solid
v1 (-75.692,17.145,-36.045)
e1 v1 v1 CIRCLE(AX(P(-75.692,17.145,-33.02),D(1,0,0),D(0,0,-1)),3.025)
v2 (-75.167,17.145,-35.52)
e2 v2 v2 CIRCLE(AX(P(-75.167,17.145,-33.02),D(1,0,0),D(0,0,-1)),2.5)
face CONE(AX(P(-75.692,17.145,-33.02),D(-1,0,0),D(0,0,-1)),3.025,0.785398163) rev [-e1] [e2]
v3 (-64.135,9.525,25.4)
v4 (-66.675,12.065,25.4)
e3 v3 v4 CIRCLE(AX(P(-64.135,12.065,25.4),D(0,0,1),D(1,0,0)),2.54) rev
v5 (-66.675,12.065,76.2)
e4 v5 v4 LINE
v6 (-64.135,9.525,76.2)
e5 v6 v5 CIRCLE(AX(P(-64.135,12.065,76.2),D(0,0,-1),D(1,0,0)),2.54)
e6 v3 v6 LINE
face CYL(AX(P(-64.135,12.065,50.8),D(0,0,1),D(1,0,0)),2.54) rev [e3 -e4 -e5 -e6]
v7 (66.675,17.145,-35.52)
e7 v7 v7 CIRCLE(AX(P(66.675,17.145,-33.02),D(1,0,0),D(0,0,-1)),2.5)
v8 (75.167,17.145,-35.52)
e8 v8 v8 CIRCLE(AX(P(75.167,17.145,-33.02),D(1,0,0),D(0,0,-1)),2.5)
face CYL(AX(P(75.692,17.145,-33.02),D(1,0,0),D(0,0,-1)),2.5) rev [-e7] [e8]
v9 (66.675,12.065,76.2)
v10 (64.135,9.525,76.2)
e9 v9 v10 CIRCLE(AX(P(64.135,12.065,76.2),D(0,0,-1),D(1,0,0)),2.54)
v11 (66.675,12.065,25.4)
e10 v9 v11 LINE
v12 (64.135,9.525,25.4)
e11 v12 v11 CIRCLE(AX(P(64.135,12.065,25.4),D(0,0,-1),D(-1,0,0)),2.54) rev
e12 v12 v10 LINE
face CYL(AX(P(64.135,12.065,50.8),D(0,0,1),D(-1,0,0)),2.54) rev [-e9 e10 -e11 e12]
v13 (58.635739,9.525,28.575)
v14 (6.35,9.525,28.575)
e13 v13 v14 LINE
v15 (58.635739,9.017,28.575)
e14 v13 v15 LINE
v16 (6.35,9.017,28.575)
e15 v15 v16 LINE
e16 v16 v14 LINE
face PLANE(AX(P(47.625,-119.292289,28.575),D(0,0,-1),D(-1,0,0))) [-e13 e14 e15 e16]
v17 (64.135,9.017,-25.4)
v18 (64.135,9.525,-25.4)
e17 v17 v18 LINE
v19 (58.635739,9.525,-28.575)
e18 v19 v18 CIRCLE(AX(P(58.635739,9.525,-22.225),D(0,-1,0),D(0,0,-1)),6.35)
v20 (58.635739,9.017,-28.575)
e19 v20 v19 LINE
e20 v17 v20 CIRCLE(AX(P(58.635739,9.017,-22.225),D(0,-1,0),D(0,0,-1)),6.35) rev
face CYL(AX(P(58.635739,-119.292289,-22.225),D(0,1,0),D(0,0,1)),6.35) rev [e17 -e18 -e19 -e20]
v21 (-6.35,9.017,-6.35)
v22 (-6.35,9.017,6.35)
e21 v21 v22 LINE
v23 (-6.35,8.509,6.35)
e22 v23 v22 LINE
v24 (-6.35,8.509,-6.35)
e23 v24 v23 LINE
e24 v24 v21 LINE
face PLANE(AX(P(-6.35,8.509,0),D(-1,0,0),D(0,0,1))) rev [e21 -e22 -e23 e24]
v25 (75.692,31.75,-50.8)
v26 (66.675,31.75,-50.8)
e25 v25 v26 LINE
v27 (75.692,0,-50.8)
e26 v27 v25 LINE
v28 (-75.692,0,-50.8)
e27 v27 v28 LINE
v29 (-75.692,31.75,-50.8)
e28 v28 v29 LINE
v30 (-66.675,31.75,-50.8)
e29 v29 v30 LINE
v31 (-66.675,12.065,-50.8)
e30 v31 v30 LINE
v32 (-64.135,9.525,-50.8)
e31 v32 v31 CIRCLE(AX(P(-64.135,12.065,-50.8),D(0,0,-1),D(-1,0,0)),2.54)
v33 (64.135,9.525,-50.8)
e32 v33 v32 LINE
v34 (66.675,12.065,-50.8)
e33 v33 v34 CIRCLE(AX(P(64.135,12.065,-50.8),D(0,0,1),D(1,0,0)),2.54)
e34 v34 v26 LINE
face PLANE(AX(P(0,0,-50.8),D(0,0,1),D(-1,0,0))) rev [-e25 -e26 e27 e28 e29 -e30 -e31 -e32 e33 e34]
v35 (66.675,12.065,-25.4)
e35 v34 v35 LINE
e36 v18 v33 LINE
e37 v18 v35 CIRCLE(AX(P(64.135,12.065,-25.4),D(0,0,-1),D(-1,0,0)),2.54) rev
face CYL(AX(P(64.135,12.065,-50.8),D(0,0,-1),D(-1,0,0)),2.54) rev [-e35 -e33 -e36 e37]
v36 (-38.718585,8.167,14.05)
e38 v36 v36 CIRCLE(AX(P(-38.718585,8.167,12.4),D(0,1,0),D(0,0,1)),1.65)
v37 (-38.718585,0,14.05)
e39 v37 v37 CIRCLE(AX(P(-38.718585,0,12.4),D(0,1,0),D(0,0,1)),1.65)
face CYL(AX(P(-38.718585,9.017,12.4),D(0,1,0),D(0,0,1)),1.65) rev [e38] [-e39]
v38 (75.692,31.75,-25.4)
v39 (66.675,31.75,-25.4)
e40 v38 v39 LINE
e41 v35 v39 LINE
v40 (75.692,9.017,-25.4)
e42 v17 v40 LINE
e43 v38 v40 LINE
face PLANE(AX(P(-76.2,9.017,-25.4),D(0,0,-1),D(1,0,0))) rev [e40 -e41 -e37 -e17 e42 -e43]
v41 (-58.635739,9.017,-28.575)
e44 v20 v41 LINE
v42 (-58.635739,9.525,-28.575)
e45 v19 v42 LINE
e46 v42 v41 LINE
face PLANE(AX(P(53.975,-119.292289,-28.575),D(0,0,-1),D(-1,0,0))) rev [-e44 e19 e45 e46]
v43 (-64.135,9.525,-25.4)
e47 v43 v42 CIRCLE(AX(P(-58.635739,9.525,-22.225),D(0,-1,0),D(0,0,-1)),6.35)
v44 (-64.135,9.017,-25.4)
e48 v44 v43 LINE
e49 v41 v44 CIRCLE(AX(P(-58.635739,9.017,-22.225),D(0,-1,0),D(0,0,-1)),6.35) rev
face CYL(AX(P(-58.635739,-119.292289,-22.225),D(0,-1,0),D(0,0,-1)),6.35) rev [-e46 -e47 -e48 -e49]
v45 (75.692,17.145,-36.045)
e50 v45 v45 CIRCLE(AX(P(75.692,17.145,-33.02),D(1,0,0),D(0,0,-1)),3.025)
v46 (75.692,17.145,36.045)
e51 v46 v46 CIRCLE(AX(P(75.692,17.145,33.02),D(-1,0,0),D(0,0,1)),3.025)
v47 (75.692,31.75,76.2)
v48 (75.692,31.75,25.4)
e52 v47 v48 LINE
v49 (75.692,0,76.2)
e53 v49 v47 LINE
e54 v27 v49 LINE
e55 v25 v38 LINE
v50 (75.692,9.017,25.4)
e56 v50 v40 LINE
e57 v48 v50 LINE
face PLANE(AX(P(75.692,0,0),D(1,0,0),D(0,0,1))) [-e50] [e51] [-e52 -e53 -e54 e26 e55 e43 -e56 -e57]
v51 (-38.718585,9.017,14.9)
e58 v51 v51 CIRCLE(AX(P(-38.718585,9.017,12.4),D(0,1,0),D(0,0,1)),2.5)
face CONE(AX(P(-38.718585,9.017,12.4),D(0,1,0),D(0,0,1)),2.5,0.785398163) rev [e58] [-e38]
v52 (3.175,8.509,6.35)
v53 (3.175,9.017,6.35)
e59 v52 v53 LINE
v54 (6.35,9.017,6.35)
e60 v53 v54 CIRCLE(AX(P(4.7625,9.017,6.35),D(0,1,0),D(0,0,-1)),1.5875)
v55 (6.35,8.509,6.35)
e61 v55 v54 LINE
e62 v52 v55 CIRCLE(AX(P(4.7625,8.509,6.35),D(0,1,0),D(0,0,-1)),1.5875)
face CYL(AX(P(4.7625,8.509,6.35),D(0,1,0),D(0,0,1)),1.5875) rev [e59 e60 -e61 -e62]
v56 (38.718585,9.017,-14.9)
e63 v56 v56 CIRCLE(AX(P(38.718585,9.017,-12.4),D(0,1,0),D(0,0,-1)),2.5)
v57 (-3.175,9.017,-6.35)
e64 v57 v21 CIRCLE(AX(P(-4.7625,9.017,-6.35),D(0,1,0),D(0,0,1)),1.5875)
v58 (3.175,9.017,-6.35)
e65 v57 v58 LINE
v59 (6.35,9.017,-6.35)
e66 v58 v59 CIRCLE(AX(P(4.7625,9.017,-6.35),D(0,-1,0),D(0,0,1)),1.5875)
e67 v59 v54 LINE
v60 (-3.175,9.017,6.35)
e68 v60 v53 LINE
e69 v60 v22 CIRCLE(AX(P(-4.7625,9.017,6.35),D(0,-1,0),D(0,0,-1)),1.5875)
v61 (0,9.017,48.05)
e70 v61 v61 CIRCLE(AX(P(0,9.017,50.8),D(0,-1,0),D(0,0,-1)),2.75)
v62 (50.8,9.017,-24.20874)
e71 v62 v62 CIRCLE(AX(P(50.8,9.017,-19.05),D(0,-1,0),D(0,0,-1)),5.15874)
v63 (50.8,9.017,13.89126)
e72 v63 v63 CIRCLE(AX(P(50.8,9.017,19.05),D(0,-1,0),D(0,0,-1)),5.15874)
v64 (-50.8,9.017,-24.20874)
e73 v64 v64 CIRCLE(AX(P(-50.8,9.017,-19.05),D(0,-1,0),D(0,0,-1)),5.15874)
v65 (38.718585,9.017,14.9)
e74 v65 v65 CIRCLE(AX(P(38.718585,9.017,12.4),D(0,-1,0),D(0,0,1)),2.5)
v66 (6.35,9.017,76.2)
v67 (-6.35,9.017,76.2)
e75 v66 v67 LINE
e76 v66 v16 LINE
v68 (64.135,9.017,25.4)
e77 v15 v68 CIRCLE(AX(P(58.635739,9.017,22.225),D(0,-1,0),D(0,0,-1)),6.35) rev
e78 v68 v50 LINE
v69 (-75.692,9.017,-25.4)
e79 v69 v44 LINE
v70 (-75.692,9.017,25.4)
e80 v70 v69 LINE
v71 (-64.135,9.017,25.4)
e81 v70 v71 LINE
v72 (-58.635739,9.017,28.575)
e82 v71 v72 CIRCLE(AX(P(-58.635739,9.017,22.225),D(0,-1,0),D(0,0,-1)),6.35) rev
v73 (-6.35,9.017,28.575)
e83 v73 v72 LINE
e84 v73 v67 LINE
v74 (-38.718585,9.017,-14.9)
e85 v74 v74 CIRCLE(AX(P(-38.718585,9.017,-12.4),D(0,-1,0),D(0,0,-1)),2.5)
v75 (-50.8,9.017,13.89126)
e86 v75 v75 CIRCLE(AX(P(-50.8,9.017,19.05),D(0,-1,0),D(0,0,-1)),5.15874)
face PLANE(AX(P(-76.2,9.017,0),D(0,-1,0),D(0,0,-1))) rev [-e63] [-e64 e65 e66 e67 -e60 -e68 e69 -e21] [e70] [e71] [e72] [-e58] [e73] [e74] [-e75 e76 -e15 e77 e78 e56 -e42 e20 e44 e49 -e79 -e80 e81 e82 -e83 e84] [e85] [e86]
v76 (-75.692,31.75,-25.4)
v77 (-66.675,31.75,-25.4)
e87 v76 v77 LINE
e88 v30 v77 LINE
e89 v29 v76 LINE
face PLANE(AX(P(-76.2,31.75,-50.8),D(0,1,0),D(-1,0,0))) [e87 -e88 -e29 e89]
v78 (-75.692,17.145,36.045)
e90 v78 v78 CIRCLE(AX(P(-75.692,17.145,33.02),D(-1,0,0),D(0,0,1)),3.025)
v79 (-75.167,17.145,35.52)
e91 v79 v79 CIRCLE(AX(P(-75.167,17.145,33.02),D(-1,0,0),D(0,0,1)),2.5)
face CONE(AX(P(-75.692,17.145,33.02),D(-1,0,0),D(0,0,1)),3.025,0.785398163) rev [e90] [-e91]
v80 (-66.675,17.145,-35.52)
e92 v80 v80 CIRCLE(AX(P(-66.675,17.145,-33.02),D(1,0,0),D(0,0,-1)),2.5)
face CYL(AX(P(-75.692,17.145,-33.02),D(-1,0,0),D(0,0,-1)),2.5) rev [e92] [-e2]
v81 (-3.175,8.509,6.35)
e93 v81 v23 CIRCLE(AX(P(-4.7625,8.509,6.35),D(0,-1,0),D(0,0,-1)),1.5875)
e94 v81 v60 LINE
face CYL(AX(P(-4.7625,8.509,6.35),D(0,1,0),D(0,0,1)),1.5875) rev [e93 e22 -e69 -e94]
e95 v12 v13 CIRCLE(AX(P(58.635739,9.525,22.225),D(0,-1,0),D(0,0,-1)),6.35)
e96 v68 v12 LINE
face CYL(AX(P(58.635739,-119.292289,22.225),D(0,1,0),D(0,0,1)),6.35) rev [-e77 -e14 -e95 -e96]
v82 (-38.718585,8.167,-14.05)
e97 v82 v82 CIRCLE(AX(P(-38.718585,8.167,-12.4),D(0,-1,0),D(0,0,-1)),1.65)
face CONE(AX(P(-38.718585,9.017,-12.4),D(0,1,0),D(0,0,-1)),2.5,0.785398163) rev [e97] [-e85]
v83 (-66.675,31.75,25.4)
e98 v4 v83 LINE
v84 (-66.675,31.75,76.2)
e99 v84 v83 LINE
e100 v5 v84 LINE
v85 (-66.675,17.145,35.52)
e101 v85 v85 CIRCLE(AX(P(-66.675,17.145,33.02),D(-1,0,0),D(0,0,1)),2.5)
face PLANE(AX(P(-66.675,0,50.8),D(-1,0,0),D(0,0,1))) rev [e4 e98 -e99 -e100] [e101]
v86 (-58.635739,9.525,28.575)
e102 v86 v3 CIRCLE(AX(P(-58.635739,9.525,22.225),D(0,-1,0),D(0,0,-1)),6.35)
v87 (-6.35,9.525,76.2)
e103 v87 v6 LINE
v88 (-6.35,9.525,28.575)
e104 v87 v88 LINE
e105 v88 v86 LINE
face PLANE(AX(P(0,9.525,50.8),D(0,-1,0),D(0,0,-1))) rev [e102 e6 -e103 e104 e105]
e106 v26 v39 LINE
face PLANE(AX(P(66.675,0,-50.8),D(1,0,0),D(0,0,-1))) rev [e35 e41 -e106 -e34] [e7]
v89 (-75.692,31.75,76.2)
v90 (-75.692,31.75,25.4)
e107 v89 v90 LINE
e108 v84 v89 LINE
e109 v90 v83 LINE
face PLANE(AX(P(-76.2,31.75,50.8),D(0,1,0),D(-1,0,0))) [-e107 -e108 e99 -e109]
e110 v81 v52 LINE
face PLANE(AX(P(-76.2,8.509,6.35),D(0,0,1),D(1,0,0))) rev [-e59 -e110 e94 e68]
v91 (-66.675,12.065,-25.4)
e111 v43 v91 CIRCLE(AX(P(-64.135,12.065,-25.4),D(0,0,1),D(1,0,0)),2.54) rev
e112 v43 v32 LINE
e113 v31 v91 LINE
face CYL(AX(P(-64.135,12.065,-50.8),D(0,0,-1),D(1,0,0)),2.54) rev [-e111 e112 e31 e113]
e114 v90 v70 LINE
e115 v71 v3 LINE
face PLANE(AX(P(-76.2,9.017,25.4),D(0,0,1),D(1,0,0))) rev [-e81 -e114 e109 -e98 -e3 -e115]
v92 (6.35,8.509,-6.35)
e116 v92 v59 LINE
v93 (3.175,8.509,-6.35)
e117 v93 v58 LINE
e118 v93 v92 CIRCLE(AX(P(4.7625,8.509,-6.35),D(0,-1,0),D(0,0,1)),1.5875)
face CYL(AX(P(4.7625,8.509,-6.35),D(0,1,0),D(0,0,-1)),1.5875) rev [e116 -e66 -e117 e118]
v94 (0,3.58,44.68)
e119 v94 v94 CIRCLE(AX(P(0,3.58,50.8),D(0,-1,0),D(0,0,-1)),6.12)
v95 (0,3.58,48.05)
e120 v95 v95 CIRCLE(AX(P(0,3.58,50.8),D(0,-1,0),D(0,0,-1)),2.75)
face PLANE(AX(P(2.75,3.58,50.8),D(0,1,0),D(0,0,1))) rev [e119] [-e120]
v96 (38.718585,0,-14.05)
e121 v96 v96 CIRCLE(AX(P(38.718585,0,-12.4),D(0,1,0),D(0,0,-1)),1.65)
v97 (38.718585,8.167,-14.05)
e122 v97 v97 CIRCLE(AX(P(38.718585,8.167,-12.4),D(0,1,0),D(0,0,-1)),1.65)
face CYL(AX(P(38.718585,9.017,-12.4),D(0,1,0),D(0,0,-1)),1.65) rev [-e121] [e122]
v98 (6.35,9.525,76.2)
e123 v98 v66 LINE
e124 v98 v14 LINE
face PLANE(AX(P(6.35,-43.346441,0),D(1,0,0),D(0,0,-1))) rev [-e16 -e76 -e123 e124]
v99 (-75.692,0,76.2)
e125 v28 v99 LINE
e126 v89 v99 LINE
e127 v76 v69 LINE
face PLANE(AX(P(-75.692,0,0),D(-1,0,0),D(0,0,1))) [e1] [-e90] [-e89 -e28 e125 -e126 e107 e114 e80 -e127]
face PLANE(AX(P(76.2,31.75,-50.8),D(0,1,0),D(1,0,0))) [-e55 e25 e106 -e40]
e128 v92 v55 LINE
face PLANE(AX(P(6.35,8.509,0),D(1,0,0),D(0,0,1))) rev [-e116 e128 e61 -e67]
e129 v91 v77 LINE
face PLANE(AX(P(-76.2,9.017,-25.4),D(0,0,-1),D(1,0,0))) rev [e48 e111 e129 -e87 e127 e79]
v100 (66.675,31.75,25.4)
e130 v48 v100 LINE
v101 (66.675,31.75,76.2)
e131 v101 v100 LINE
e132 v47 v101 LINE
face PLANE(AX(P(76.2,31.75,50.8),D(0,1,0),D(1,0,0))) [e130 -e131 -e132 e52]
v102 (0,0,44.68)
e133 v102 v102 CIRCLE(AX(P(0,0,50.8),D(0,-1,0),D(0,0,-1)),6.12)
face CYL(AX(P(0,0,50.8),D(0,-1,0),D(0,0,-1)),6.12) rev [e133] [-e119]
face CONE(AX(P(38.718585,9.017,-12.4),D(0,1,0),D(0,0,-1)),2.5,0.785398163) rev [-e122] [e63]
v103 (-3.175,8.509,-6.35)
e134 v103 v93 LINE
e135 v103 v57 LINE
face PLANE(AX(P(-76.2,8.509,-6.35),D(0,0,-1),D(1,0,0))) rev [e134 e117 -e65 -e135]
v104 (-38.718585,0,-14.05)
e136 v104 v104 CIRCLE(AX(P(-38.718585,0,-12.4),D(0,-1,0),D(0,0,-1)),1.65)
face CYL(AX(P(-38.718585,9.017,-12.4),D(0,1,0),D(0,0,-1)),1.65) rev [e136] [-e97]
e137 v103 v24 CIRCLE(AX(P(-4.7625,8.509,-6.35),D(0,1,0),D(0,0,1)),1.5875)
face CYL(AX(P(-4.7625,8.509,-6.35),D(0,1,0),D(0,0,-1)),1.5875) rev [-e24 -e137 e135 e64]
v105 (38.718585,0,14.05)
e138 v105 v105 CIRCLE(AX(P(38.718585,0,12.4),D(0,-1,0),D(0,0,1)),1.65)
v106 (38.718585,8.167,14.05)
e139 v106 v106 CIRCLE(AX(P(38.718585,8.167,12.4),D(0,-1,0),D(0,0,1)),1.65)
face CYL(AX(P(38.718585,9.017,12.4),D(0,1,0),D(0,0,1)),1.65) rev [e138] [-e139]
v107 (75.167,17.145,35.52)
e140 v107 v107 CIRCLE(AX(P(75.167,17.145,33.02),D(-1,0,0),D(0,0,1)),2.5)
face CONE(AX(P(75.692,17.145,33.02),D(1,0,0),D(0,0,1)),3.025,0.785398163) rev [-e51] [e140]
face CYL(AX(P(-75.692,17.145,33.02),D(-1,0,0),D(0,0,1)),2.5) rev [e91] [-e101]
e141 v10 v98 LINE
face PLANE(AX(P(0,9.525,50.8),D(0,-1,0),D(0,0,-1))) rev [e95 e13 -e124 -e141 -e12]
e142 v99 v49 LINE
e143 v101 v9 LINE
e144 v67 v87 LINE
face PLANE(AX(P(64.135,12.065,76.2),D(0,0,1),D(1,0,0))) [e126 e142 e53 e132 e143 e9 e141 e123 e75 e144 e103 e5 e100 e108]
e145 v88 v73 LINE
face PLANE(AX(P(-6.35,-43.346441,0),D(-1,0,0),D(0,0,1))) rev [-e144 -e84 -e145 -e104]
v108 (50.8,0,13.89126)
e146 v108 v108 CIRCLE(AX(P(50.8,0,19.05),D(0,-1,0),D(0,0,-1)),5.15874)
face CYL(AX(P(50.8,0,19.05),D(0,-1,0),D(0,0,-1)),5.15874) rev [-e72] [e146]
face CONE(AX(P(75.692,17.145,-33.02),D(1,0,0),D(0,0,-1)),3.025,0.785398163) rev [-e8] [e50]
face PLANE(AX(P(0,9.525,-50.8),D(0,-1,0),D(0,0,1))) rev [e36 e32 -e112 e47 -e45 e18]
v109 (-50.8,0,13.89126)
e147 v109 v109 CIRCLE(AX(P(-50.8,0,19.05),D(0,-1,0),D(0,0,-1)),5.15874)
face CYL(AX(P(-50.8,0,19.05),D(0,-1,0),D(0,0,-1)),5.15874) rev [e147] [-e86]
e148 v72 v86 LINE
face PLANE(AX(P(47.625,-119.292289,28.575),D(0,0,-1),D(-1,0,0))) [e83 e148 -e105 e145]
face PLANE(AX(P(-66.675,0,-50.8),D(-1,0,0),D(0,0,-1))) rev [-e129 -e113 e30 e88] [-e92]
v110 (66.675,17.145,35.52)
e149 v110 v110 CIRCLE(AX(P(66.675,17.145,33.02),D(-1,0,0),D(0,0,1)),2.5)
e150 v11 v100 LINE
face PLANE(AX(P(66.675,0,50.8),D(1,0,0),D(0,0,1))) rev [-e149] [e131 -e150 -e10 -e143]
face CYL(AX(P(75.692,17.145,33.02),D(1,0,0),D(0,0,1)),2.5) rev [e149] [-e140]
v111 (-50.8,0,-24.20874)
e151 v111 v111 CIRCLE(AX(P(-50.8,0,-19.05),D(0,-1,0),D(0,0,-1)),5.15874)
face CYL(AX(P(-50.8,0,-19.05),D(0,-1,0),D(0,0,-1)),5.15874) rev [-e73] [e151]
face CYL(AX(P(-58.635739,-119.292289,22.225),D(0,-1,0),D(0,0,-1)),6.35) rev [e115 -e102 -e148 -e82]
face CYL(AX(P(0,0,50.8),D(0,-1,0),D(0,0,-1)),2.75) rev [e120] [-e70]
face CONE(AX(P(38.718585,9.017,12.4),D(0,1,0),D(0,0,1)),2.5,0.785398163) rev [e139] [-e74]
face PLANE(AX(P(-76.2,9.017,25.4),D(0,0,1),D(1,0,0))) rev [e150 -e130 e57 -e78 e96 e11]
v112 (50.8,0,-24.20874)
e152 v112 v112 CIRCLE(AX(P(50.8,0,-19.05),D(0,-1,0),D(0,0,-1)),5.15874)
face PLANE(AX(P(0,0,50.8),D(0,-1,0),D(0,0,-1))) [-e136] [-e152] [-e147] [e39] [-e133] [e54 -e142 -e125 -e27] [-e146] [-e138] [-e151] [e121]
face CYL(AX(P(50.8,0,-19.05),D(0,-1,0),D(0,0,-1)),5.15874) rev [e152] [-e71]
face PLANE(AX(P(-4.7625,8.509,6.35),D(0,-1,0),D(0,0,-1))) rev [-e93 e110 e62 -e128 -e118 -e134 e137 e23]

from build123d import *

# Parameters (mm, degrees)
EXTRUDE_THIN1_DEPTH                     = 50.8
FILLET2_R                               = 2.54
CUT_EXTRUDE1_DEPTH                      = 97.928543268
CUT_EXTRUDE1_DEPTH_BACK                 = 97.928543268
SKETCH5_W                               = 25.4
SKETCH5_H                               = 22.733
CUT_EXTRUDE2_START                      = 9.017
CUT_EXTRUDE2_DEPTH                      = 0.508
CUT_EXTRUDE3_START                      = -76.2
SKETCH8_W                               = 50.8
SKETCH8_H                               = 31.75
CUT_EXTRUDE3_DEPTH                      = 0.508
M4X0_7_TAPPED_HOLE2_D                   = 3.3
M4X0_7_TAPPED_HOLE2_CSINK_D             = 5
M4X0_7_TAPPED_HOLE2_CSINK_ANGLE         = 90
M6X1_0_TAPPED_HOLE1_D                   = 5
M6X1_0_TAPPED_HOLE1_CSINK_D             = 6.05
M6X1_0_TAPPED_HOLE1_CSINK_ANGLE         = 90
MIRROR1_2_OUTLINE_R                     = 1.65
MIRROR1_2_DEPTH                         = 9.017
MIRROR1_START                           = 9.017
MIRROR1_3_OUTLINE_W                     = 75.692
MIRROR1_3_OUTLINE_H                     = 25.4
MIRROR1_3_OUTLINE_W_2                   = 151.384
MIRROR1_3_DEPTH                         = 3.048
MIRROR1_START_2                         = 9.8422079
MIRROR1_4_OUTLINE_W                     = 9.017
MIRROR1_4_OUTLINE_H                     = 25.4
MIRROR1_4_DEPTH                         = 21.9077921
MIRROR1_5_DEPTH                         = 8.509
MIRROR1_START_3                         = -50.8
MIRROR1_6_DEPTH                         = 101.6
SKETCH14_W                              = 12.7
SKETCH14_H                              = 50.8
CUT_EXTRUDE4_DEPTH                      = 0.508
BOSS_EXTRUDE1_DEPTH                     = 25.4
CBORE_FOR_M5_HEX_HEAD_BOLT1_D           = 5.5
CBORE_FOR_M5_HEX_HEAD_BOLT1_DEPTH       = 12.3063
CBORE_FOR_M5_HEX_HEAD_BOLT1_CBORE_D     = 12.24
CBORE_FOR_M5_HEX_HEAD_BOLT1_CBORE_DEPTH = 3.58
CBORE_FOR_M5_HEX_HEAD_BOLT1_TIP         = 1.652366702
CUT_EXTRUDE6_DEPTH                      = 0.508
FILLET3_R                               = 6.35


with BuildPart() as part:
    # Sketch4 → Extrude-Thin1 (new body)
    with BuildSketch(Plane.XY):
        Polygon((0, 0), (-76.2, 0), (-76.2, 31.75), (-66.675, 31.75), (-66.675, 9.525), (0, 9.525), align=None)
    extrude(amount=EXTRUDE_THIN1_DEPTH)

    # Fillet2
    fillet2_edges = [part.edges().sort_by_distance(p)[0] for p in [
        (-66.675, 9.525, 25.4),
    ]]
    fillet(fillet2_edges, radius=FILLET2_R)

    # Sketch5 → Cut-Extrude1 (cut, two sides: drawn at the far end of the back side and taken through both)
    with BuildSketch(Plane(origin=(0, 0, 0), x_dir=(0, 0, -1), z_dir=(1, 0, 0)).offset(-CUT_EXTRUDE1_DEPTH_BACK)):
        with Locations((-12.7, 20.3835)):
            Rectangle(SKETCH5_W, SKETCH5_H)
    extrude(amount=CUT_EXTRUDE1_DEPTH + CUT_EXTRUDE1_DEPTH_BACK, mode=Mode.SUBTRACT)

    # Sketch7 → Cut-Extrude2 (cut)
    with BuildSketch(Plane(origin=(0, 0, 0), x_dir=(1, 0, 0), z_dir=(0, 1, 0)).offset(CUT_EXTRUDE2_START)):
        with BuildLine():
            Line((0, 0), (-6.35, 0))
            Line((-6.35, 0), (-6.35, -6.35))
            ThreePointArc((-6.35, -6.35), (-4.7625, -7.9375), (-3.175, -6.35))
            Line((-3.175, -6.35), (0, -6.35))
            Line((0, -6.35), (0, 0))
        make_face()
    extrude(amount=-CUT_EXTRUDE2_DEPTH, mode=Mode.SUBTRACT)

    # Sketch8 → Cut-Extrude3 (cut)
    with BuildSketch(Plane(origin=(0, 0, 0), x_dir=(0, 0, -1), z_dir=(1, 0, 0)).offset(CUT_EXTRUDE3_START)):
        with Locations((-25.4, 15.875)):
            Rectangle(SKETCH8_W, SKETCH8_H)
    extrude(amount=CUT_EXTRUDE3_DEPTH, mode=Mode.SUBTRACT)

    # M4x0.7 Tapped Hole2 (through all)
    with Locations(Plane(origin=(0, 9.017, 0), x_dir=(1, 0, 0), z_dir=(0, 1, 0))):
        with Locations((-38.718585116, -12.4)):
            CounterSinkHole(M4X0_7_TAPPED_HOLE2_D / 2, M4X0_7_TAPPED_HOLE2_CSINK_D / 2, counter_sink_angle=M4X0_7_TAPPED_HOLE2_CSINK_ANGLE)

    # M6x1.0 Tapped Hole1 (through all)
    with Locations(Plane.ZY.offset(75.692)):
        with Locations((33.02, 17.145)):
            CounterSinkHole(M6X1_0_TAPPED_HOLE1_D / 2, M6X1_0_TAPPED_HOLE1_CSINK_D / 2, counter_sink_angle=M6X1_0_TAPPED_HOLE1_CSINK_ANGLE)

    # Mirror1 2 outline → Mirror1 2 (add)
    with BuildSketch(Plane(origin=(0, 0, 0), x_dir=(1, 0, 0), z_dir=(0, 1, 0))):
        with BuildLine():
            Line((75.692, -50.8), (75.692, 50.8))
            Line((75.692, 50.8), (-75.692, 50.8))
            Line((-75.692, 50.8), (-75.692, 0))
            Line((-75.692, 0), (-6.35, 0))
            Line((-6.35, 0), (-6.35, 6.35))
            ThreePointArc((-6.35, 6.35), (-4.7625, 7.9375), (-3.175, 6.35))
            Line((-3.175, 6.35), (3.175, 6.35))
            ThreePointArc((3.175, 6.35), (4.7625, 7.9375), (6.35, 6.35))
            Line((6.35, 6.35), (6.35, -6.35))
            ThreePointArc((6.35, -6.35), (4.7625, -7.9375), (3.175, -6.35))
            Line((3.175, -6.35), (0, -6.35))
            Line((0, -6.35), (0, -50.8))
            Line((0, -50.8), (75.692, -50.8))
        make_face()
        with Locations((38.718585116, 12.4)):
            Circle(MIRROR1_2_OUTLINE_R, mode=Mode.SUBTRACT)
        with Locations((-38.718585116, 12.4)):
            Circle(MIRROR1_2_OUTLINE_R, mode=Mode.SUBTRACT)
        with Locations((38.718585116, -12.4)):
            Circle(MIRROR1_2_OUTLINE_R, mode=Mode.SUBTRACT)
    extrude(amount=MIRROR1_2_DEPTH)

    # Mirror1 3 outline → Mirror1 3 (add)
    with BuildSketch(Plane(origin=(0, 0, 0), x_dir=(1, 0, 0), z_dir=(0, 1, 0)).offset(MIRROR1_START)):
        with Locations((37.846, -38.1)):
            Rectangle(MIRROR1_3_OUTLINE_W, MIRROR1_3_OUTLINE_H)
        with Locations((0, 38.1)):
            Rectangle(MIRROR1_3_OUTLINE_W_2, MIRROR1_3_OUTLINE_H)
    extrude(amount=MIRROR1_3_DEPTH)



with BuildPart() as body_2:
    # Mirror1: read off the stored shape, not the designer's step
    # Mirror1 outline → Mirror1 (revolve)
    with BuildSketch(Plane(origin=(0, 17.145, -33.02), x_dir=(0, 1, 0), z_dir=(0, 0, -1))):
        Polygon((3.025, -66.675), (2.5, -66.675), (2.5, -75.167), (3.025, -75.692), align=None)
        Polygon((2.5, 75.167), (2.5, 66.675), (3.025, 66.675), (3.025, 75.692), align=None)
    revolve(axis=Axis((0, 17.145, -33.02), (1, 0, 0)))


with BuildPart() as part_1:
    add(part.part)

    add(body_2.part)  # Mirror1 4 merges body 2
    # Mirror1 4 outline → Mirror1 4 (add)
    with BuildSketch(Plane(origin=(0, 0, 0), x_dir=(1, 0, 0), z_dir=(0, 1, 0)).offset(MIRROR1_START_2)):
        with Locations((71.1835, -38.1)):
            Rectangle(MIRROR1_4_OUTLINE_W, MIRROR1_4_OUTLINE_H)
        with Locations((71.1835, 38.1)):
            Rectangle(MIRROR1_4_OUTLINE_W, MIRROR1_4_OUTLINE_H)
        with Locations((-71.1835, 38.1)):
            Rectangle(MIRROR1_4_OUTLINE_W, MIRROR1_4_OUTLINE_H)
    extrude(amount=MIRROR1_4_DEPTH)

    # Mirror1 5 outline → Mirror1 5 (add)
    with BuildSketch(Plane(origin=(0, 0, 0), x_dir=(1, 0, 0), z_dir=(0, 1, 0))):
        with BuildLine():
            Line((0, 0), (0, -6.35))
            Line((0, -6.35), (3.175, -6.35))
            ThreePointArc((3.175, -6.35), (4.7625, -7.9375), (6.35, -6.35))
            Line((6.35, -6.35), (6.35, 6.35))
            ThreePointArc((6.35, 6.35), (4.7625, 7.9375), (3.175, 6.35))
            Line((3.175, 6.35), (-3.175, 6.35))
            ThreePointArc((-3.175, 6.35), (-4.7625, 7.9375), (-6.35, 6.35))
            Line((-6.35, 6.35), (-6.35, 0))
            Line((-6.35, 0), (0, 0))
        make_face()
    extrude(amount=MIRROR1_5_DEPTH)

    # Mirror1 6 outline → Mirror1 6 (cut)
    with BuildSketch(Plane.XY.offset(MIRROR1_START_3)):
        with BuildLine():
            ThreePointArc((-66.675, 12.065), (-65.931051224, 10.268948776), (-64.135, 9.525))
            Line((-64.135, 9.525), (64.135, 9.525))
            ThreePointArc((64.135, 9.525), (65.931051224, 10.268948776), (66.675, 12.065))
            Line((66.675, 12.065), (-66.675, 12.065))
        make_face()
    extrude(amount=MIRROR1_6_DEPTH, mode=Mode.SUBTRACT)

    # Mirror1 7 outline → Mirror1 7 (revolve, cut)
    with BuildSketch(Plane(origin=(0, 17.145, 33.02), x_dir=(0, 1, 0), z_dir=(0, 0, -1))):
        Polygon((0, 66.675), (2.5, 66.675), (2.5, 75.167), (3.025, 75.692), (0, 75.692), align=None)
    revolve(axis=Axis((0, 17.145, 33.02), (1, 0, 0)), mode=Mode.SUBTRACT)

    # Mirror1 8 outline → Mirror1 8 (revolve, cut)
    with BuildSketch(Plane(origin=(-38.718585116, 0, -12.4), x_dir=(1, 0, 0), z_dir=(0, 0, 1))):
        Polygon((1.65, 9.017), (1.65, 8.167), (2.5, 9.017), align=None)
    revolve(axis=Axis((-38.718585116, 0, -12.4), (0, 1, 0)), mode=Mode.SUBTRACT)

    # Mirror1 9 outline → Mirror1 9 (revolve, cut)
    with BuildSketch(Plane(origin=(0, 17.145, -33.02), x_dir=(0, 1, 0), z_dir=(0, 0, -1))):
        Polygon((2.5, -75.167), (2.5, -66.675), (0, -66.675), (0, -75.692), (3.025, -75.692), align=None)
        Polygon((0, 66.675), (2.5, 66.675), (2.5, 75.167), (3.025, 75.692), (0, 75.692), align=None)
    revolve(axis=Axis((0, 17.145, -33.02), (1, 0, 0)), mode=Mode.SUBTRACT)

    # Mirror1 10 outline → Mirror1 10 (revolve, cut)
    with BuildSketch(Plane(origin=(38.718585116, 0, 12.4), x_dir=(1, 0, 0), z_dir=(0, 0, 1))):
        Polygon((1.65, 9.017), (1.65, 8.167), (2.5, 9.017), align=None)
    revolve(axis=Axis((38.718585116, 0, 12.4), (0, 1, 0)), mode=Mode.SUBTRACT)

    # Mirror1 11 outline → Mirror1 11 (revolve, cut)
    with BuildSketch(Plane(origin=(38.718585116, 0, -12.4), x_dir=(1, 0, 0), z_dir=(0, 0, 1))):
        Polygon((1.65, 9.017), (1.65, 8.167), (2.5, 9.017), align=None)
    revolve(axis=Axis((38.718585116, 0, -12.4), (0, 1, 0)), mode=Mode.SUBTRACT)

    # Sketch14 → Cut-Extrude4 (cut)
    with BuildSketch(Plane(origin=(0, 9.525, 0), x_dir=(1, 0, 0), z_dir=(0, 1, 0))):
        with Locations((0, -25.4)):
            Rectangle(SKETCH14_W, SKETCH14_H)
    extrude(amount=-CUT_EXTRUDE4_DEPTH, mode=Mode.SUBTRACT)

    # Sketch15 → Boss-Extrude1 (add)
    with BuildSketch(Plane.XY.offset(50.8)):
        with BuildLine():
            Line((-75.692, 0), (75.692, 0))
            Line((75.692, 0), (75.692, 31.75))
            Line((75.692, 31.75), (66.675, 31.75))
            Line((66.675, 31.75), (66.675, 12.065))
            ThreePointArc((66.675, 12.065), (65.931051224, 10.268948776), (64.135, 9.525))
            Line((64.135, 9.525), (6.35, 9.525))
            Line((6.35, 9.525), (6.35, 9.017))
            Line((6.35, 9.017), (-6.35, 9.017))
            Line((-6.35, 9.017), (-6.35, 9.525))
            Line((-6.35, 9.525), (-64.135, 9.525))
            ThreePointArc((-64.135, 9.525), (-65.931051224, 10.268948776), (-66.675, 12.065))
            Line((-66.675, 12.065), (-66.675, 31.75))
            Line((-66.675, 31.75), (-75.692, 31.75))
            Line((-75.692, 31.75), (-75.692, 0))
        make_face()
    extrude(amount=BOSS_EXTRUDE1_DEPTH)

    # CBORE for M5 Hex Head Bolt1
    with Locations(Plane(origin=(0, 0, 0), x_dir=(-1, 0, 0), z_dir=(0, -1, 0))):
        with Locations((0, -50.8)):
            CounterBoreHole(CBORE_FOR_M5_HEX_HEAD_BOLT1_D / 2, CBORE_FOR_M5_HEX_HEAD_BOLT1_CBORE_D / 2, CBORE_FOR_M5_HEX_HEAD_BOLT1_CBORE_DEPTH, depth=CBORE_FOR_M5_HEX_HEAD_BOLT1_DEPTH)
            with Locations((0, 0, -(CBORE_FOR_M5_HEX_HEAD_BOLT1_DEPTH + CBORE_FOR_M5_HEX_HEAD_BOLT1_TIP / 2))):  # 118° drill point
                Cone(0, CBORE_FOR_M5_HEX_HEAD_BOLT1_D / 2, CBORE_FOR_M5_HEX_HEAD_BOLT1_TIP, mode=Mode.SUBTRACT)

    # Sketch24 → 3/8 Clearance Hole2 (revolve, cut)
    with BuildSketch(Plane(origin=(50.8, 0, -19.05), x_dir=(0, 0, -1), z_dir=(1, 0, 0))):
        Polygon((0, 0), (0, 15.40598371), (5.15874, 12.3063), (5.15874, 0), align=None)
    f_3_8_clearance_hole2 = revolve(axis=Axis((50.8, -6.35, -19.05), (0, 1, 0)), mode=Mode.SUBTRACT)

    # Sketch25 → Cut-Extrude6 (cut)
    with BuildSketch(Plane(origin=(0, 9.525, 0), x_dir=(1, 0, 0), z_dir=(0, 1, 0))):
        Polygon((53.975, 28.575), (64.135, 28.575), (64.135, 25.4), (-64.135, 25.4), (-64.135, 28.575), (47.625, 28.575), align=None)
    cut_extrude6 = extrude(amount=-CUT_EXTRUDE6_DEPTH, mode=Mode.SUBTRACT)

    # Mirror3: Cut-Extrude6 across plane
    add(cut_extrude6.mirror(Plane.XY), mode=Mode.SUBTRACT)

    # Mirror3 at the second plane: Cut-Extrude6 across plane
    add(cut_extrude6.mirror(Plane(origin=(0, 0, 0), x_dir=(0, 0, 1), z_dir=(1, 0, 0))), mode=Mode.SUBTRACT)

    # Mirror2: 3/8 Clearance Hole2 across plane
    add(f_3_8_clearance_hole2.mirror(Plane(origin=(0, 0, 0), x_dir=(0, 0, 1), z_dir=(1, 0, 0))), mode=Mode.SUBTRACT)

    # Mirror2 at the second plane: 3/8 Clearance Hole2 across plane
    add(f_3_8_clearance_hole2.mirror(Plane.XY), mode=Mode.SUBTRACT)

    # Mirror2 at the second plane copy 1 sketc → Mirror2 at the second plane copy 1 (revolve, cut)
    with BuildSketch(Plane(origin=(-50.8, 0, 19.05), x_dir=(0, 0, 1), z_dir=(-1, 0, 0))):
        Polygon((0, 0), (0, 15.40598371), (5.15874, 12.3063), (5.15874, 0), align=None)
    revolve(axis=Axis((-50.8, -6.35, 19.05), (0, 1, 0)), mode=Mode.SUBTRACT)

    # Fillet3
    # the kernel refuses this fillet: 6.35 mm, written as the material it adds along each edge
    with BuildSketch(Plane(origin=(64.135, 9.525, -28.575), x_dir=(-1, 0, 0), z_dir=(0, -1, 0))) as fillet3_piece_1_section:
        with BuildLine():
            CenterArc((5.499261314, -6.35), FILLET3_R, 90, 60)
            Line((0, -3.175), (0, 0))
            Line((0, 0), (5.499261314, 0))
        make_face()
    fillet3_piece_1 = extrude(amount=14.256153285, mode=Mode.PRIVATE)
    fillet3_piece_1 = split(fillet3_piece_1, bisect_by=Plane(origin=(64.135, 0, -28.575), z_dir=(0, 1, 0)), keep=Keep.TOP, mode=Mode.PRIVATE)
    add(fillet3_piece_1)
    with BuildSketch(Plane(origin=(-64.135, 9.525, -28.575), x_dir=(0, 0, 1), z_dir=(0, -1, 0))) as fillet3_piece_2_section:
        with BuildLine():
            CenterArc((6.35, -5.499261314), FILLET3_R, 120, 60)
            Line((0, -5.499261314), (0, 0))
            Line((0, 0), (3.175, 0))
        make_face()
    fillet3_piece_2 = extrude(amount=14.256153285, mode=Mode.PRIVATE)
    fillet3_piece_2 = split(fillet3_piece_2, bisect_by=Plane(origin=(-64.135, 0, -28.575), z_dir=(0, 1, 0)), keep=Keep.TOP, mode=Mode.PRIVATE)
    add(fillet3_piece_2)
    with BuildSketch(Plane(origin=(64.135, 9.525, 28.575), x_dir=(-1, 0, 0), z_dir=(0, -1, 0))) as fillet3_piece_3_section:
        with BuildLine():
            CenterArc((5.499261314, 6.35), FILLET3_R, 210, 60)
            Line((0, 3.175), (0, 0))
            Line((0, 0), (5.499261314, 0))
        make_face()
    fillet3_piece_3 = extrude(amount=14.256153285, mode=Mode.PRIVATE)
    fillet3_piece_3 = split(fillet3_piece_3, bisect_by=Plane(origin=(64.135, 0, 28.575), z_dir=(0, 1, 0)), keep=Keep.TOP, mode=Mode.PRIVATE)
    add(fillet3_piece_3)
    with BuildSketch(Plane(origin=(-64.135, 9.525, 28.575), x_dir=(0, 0, -1), z_dir=(0, -1, 0))) as fillet3_piece_4_section:
        with BuildLine():
            CenterArc((6.35, 5.499261314), FILLET3_R, 180, 60)
            Line((0, 5.499261314), (0, 0))
            Line((0, 0), (3.175, 0))
        make_face()
    fillet3_piece_4 = extrude(amount=14.256153285, mode=Mode.PRIVATE)
    fillet3_piece_4 = split(fillet3_piece_4, bisect_by=Plane(origin=(-64.135, 0, 28.575), z_dir=(0, 1, 0)), keep=Keep.TOP, mode=Mode.PRIVATE)
    add(fillet3_piece_4)


solid = part_1.part
